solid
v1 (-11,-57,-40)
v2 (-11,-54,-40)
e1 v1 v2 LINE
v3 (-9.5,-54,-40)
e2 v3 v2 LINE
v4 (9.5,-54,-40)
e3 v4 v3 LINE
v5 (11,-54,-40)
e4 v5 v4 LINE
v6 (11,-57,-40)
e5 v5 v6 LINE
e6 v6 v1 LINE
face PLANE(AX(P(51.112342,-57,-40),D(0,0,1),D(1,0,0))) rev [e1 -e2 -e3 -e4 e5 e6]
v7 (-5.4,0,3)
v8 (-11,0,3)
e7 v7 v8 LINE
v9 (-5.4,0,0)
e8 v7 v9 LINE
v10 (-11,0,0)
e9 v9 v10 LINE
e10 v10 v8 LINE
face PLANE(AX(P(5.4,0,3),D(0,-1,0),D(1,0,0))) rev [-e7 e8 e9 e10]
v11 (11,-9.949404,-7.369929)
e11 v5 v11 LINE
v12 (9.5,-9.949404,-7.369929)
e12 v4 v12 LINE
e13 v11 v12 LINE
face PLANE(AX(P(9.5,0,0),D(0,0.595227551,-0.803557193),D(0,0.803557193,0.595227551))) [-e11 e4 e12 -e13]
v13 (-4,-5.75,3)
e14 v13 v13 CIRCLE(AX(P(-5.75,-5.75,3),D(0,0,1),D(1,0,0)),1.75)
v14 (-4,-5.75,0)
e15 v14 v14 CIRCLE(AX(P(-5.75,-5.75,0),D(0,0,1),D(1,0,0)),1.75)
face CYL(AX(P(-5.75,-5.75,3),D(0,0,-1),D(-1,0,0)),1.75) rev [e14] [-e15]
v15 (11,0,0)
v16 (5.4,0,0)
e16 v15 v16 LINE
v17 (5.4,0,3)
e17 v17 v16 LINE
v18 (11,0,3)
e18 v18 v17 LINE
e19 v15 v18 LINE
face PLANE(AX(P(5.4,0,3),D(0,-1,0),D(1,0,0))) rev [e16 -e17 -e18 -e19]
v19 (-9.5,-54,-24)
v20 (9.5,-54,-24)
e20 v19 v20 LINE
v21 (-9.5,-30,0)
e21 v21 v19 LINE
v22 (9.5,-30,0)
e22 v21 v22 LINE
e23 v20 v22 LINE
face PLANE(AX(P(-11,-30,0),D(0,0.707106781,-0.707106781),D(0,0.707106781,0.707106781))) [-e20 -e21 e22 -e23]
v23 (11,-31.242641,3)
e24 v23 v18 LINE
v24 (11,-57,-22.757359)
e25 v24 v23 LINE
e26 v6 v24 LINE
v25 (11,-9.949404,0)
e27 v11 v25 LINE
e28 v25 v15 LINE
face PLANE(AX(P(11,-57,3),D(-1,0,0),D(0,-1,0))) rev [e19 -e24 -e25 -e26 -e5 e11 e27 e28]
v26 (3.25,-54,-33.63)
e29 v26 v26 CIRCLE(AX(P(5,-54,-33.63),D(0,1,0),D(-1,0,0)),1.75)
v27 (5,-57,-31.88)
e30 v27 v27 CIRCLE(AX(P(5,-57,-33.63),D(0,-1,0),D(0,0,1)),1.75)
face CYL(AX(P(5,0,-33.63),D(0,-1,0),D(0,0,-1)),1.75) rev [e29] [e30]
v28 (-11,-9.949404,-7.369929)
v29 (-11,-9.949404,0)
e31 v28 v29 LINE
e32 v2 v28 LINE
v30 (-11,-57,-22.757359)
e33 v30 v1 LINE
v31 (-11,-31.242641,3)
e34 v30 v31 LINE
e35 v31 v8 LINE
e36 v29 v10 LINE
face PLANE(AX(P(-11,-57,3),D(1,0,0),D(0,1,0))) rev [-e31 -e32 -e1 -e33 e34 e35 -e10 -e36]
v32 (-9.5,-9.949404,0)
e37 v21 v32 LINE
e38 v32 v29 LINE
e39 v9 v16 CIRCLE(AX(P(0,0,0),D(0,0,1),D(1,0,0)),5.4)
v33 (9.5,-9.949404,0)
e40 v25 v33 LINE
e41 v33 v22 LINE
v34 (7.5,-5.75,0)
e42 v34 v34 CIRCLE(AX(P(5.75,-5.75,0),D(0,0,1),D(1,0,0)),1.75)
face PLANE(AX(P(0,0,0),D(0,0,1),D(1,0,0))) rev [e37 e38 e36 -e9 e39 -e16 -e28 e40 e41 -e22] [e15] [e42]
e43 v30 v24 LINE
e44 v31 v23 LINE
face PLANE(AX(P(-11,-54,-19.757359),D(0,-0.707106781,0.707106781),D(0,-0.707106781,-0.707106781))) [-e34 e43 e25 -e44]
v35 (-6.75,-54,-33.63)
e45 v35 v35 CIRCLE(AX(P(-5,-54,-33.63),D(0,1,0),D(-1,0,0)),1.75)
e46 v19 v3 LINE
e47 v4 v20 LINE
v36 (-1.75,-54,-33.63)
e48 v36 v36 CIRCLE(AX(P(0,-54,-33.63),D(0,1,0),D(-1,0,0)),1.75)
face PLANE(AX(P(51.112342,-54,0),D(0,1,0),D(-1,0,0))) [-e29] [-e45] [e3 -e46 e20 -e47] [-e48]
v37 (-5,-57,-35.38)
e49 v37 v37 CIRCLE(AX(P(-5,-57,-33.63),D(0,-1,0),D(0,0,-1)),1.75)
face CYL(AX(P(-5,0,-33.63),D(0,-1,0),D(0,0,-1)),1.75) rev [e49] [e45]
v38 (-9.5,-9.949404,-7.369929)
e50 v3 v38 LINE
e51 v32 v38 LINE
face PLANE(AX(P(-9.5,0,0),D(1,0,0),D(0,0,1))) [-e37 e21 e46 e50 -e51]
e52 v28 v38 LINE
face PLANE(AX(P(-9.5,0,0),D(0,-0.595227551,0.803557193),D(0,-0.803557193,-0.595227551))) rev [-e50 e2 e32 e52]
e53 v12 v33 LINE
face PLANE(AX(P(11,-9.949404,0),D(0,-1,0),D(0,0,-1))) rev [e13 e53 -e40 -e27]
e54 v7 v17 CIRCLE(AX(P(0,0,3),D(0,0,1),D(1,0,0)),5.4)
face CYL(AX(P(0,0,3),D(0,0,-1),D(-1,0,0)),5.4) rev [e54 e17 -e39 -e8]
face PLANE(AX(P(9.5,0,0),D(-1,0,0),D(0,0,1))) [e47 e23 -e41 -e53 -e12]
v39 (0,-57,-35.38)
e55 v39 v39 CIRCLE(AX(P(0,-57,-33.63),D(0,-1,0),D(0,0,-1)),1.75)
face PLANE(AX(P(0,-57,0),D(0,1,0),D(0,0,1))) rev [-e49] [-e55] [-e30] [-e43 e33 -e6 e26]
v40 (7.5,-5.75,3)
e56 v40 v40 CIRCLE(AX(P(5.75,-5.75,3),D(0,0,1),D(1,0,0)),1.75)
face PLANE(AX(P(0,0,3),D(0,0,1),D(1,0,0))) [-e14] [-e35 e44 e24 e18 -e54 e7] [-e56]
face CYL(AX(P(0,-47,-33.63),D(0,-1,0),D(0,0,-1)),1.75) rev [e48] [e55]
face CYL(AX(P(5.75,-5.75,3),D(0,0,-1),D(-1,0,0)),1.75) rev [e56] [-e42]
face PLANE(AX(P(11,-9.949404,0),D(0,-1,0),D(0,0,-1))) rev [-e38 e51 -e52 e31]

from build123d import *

# Parameters (mm, degrees)
SKETCH1_R               = 1.75
BOSS_EXTRUDE1_DEPTH     = 3
BOSS_EXTRUDE2_DEPTH     = 3
SKETCH4_W               = 40
SKETCH4_H               = 3
BOSS_EXTRUDE3_DEPTH     = 22
SKETCH5_R               = 1.75
CUT_EXTRUDE1_DEPTH      = 10
BOSS_EXTRUDE4_DEPTH     = 1
BOSS_EXTRUDE5_DEPTH     = 22
CUT_EXTRUDE2_DEPTH      = 74.027392121
CUT_EXTRUDE3_DEPTH      = 71.498226928
SKETCH10_R              = 1.75
CUT_EXTRUDE4_DEPTH      = 71.498226928
BOSS_EXTRUDE6_DEPTH     = 1.5
CUT_EXTRUDE5_DEPTH      = 73.589599806
CUT_EXTRUDE5_DEPTH_BACK = 73.589599806


# Read off the part's stored shape, not the designer's step: Boss-Extrude2
with BuildPart() as part:
    # Sketch1 → Boss-Extrude1 (new body)
    with BuildSketch(Plane.XY):
        with BuildLine():
            Line((5.4, 4.03535718), (5.4, 0))
            ThreePointArc((5.4, 0), (0, -5.4), (-5.4, 0))
            Line((-5.4, 0), (-5.4, 4.03535718))
            ThreePointArc((-5.4, 4.03535718), (-7.5, 5.75), (-5.4, 7.46464282))
            Line((-5.4, 7.46464282), (-5.4, 9.583318841))
            ThreePointArc((-5.4, 9.583318841), (0, -11), (5.4, 9.583318841))
            Line((5.4, 9.583318841), (5.4, 7.46464282))
            ThreePointArc((5.4, 7.46464282), (6.856797181, 7.105544171), (7.5, 5.75))
            ThreePointArc((7.5, 5.75), (6.856797181, 4.394455829), (5.4, 4.03535718))
        make_face()
        with Locations((-5.75, -5.75)):
            Circle(SKETCH1_R, mode=Mode.SUBTRACT)
        with Locations((5.75, -5.75)):
            Circle(SKETCH1_R, mode=Mode.SUBTRACT)
    extrude(amount=BOSS_EXTRUDE1_DEPTH)

    # Boss-Extrude2 outline → Boss-Extrude2 (add)
    with BuildSketch(Plane.XY):
        with BuildLine():
            Line((-11, 0), (-11, -57))
            Line((-11, -57), (11, -57))
            Line((11, -57), (11, 0))
            ThreePointArc((11, 0), (0, -11), (-11, 0))
        make_face()
    extrude(amount=BOSS_EXTRUDE2_DEPTH)

    # Sketch4 → Boss-Extrude3 (add)
    with BuildSketch(Plane.ZY.offset(11)):
        with Locations((-20, -55.5)):
            Rectangle(SKETCH4_W, SKETCH4_H)
    extrude(amount=-BOSS_EXTRUDE3_DEPTH)

    # Sketch5 → Cut-Extrude1 (cut)
    with BuildSketch(Plane(origin=(0, -57, 0), x_dir=(-1, 0, 0), z_dir=(0, -1, 0))):
        with Locations(Location((0, 33.63, 0), (0, 0, 90))):
            Circle(SKETCH5_R)
    extrude(amount=-CUT_EXTRUDE1_DEPTH, mode=Mode.SUBTRACT)

    # Sketch6 → Boss-Extrude4 (add)
    with BuildSketch(Plane.ZY.offset(11)):
        Polygon((-20, -54), (0, -34), (0, -54), align=None)
    boss_extrude4 = extrude(amount=-BOSS_EXTRUDE4_DEPTH)

    # Mirror1: Boss-Extrude4 across plane
    add(boss_extrude4.mirror(Plane(origin=(0, 0, 0), x_dir=(0, 0, 1), z_dir=(1, 0, 0))))

    # Sketch7 → Boss-Extrude5 (add, through all)
    with BuildSketch(Plane(origin=(11, 0, 0), x_dir=(0, 0, -1), z_dir=(1, 0, 0))):
        Polygon((0, -30), (24, -54), (19.757359313, -54), (0, -34.242640687), align=None)
    extrude(amount=-BOSS_EXTRUDE5_DEPTH)

    # Sketch8 → Cut-Extrude2 (cut, through all)
    with BuildSketch(Plane(origin=(11, 0, 0), x_dir=(0, 0, -1), z_dir=(1, 0, 0))):
        Polygon((9.878679656, -44.121320344), (22.757359313, -57), (-3, -57), (-3, -31.242640687), align=None)
    extrude(amount=-CUT_EXTRUDE2_DEPTH, mode=Mode.SUBTRACT)

    # Sketch9 → Cut-Extrude3 (cut, through all)
    with BuildSketch(Plane(origin=(0, 0, 0), x_dir=(-1, 0, 0), z_dir=(0, 0, -1))):
        Polygon((-5.4, 0), (-11, 0), (-11, 9.583318841), (11, 9.583318841), (11, 0), align=None)
    extrude(amount=-CUT_EXTRUDE3_DEPTH, mode=Mode.SUBTRACT)

    # Sketch10 → Cut-Extrude4 (cut, through all)
    with BuildSketch(Plane(origin=(0, -57, 0), x_dir=(-1, 0, 0), z_dir=(0, -1, 0))):
        with Locations(Location((5, 33.63, 0), (0, 0, 90))):
            Circle(SKETCH10_R)
        with Locations((-5, 33.63)):
            Circle(SKETCH10_R)
    extrude(amount=-CUT_EXTRUDE4_DEPTH, mode=Mode.SUBTRACT)

    # Sketch11 → Boss-Extrude6 (add)
    with BuildSketch(Plane(origin=(11, 0, 0), x_dir=(0, 0, -1), z_dir=(1, 0, 0))):
        Polygon((0, 0), (40, -54), (40, -57), (22.757359313, -57), (-3, -31.242640687), (-3, 0), align=None)
    boss_extrude6 = extrude(amount=-BOSS_EXTRUDE6_DEPTH)

    # Mirror2: Boss-Extrude6 across plane
    add(boss_extrude6.mirror(Plane(origin=(0, 0, 0), x_dir=(0, 0, 1), z_dir=(1, 0, 0))))

    # Sketch12 → Cut-Extrude5 (cut, two sides: drawn at the far end of the back side and taken through both)
    with BuildSketch(Plane.ZY.offset(-9.5).offset(-CUT_EXTRUDE5_DEPTH_BACK)):
        Polygon((0, 0), (0, -9.949403651), (-10.711431508, -9.949403651), (-10.711431508, 0.731169273), align=None)
    extrude(amount=CUT_EXTRUDE5_DEPTH + CUT_EXTRUDE5_DEPTH_BACK, mode=Mode.SUBTRACT)


solid = part.part
